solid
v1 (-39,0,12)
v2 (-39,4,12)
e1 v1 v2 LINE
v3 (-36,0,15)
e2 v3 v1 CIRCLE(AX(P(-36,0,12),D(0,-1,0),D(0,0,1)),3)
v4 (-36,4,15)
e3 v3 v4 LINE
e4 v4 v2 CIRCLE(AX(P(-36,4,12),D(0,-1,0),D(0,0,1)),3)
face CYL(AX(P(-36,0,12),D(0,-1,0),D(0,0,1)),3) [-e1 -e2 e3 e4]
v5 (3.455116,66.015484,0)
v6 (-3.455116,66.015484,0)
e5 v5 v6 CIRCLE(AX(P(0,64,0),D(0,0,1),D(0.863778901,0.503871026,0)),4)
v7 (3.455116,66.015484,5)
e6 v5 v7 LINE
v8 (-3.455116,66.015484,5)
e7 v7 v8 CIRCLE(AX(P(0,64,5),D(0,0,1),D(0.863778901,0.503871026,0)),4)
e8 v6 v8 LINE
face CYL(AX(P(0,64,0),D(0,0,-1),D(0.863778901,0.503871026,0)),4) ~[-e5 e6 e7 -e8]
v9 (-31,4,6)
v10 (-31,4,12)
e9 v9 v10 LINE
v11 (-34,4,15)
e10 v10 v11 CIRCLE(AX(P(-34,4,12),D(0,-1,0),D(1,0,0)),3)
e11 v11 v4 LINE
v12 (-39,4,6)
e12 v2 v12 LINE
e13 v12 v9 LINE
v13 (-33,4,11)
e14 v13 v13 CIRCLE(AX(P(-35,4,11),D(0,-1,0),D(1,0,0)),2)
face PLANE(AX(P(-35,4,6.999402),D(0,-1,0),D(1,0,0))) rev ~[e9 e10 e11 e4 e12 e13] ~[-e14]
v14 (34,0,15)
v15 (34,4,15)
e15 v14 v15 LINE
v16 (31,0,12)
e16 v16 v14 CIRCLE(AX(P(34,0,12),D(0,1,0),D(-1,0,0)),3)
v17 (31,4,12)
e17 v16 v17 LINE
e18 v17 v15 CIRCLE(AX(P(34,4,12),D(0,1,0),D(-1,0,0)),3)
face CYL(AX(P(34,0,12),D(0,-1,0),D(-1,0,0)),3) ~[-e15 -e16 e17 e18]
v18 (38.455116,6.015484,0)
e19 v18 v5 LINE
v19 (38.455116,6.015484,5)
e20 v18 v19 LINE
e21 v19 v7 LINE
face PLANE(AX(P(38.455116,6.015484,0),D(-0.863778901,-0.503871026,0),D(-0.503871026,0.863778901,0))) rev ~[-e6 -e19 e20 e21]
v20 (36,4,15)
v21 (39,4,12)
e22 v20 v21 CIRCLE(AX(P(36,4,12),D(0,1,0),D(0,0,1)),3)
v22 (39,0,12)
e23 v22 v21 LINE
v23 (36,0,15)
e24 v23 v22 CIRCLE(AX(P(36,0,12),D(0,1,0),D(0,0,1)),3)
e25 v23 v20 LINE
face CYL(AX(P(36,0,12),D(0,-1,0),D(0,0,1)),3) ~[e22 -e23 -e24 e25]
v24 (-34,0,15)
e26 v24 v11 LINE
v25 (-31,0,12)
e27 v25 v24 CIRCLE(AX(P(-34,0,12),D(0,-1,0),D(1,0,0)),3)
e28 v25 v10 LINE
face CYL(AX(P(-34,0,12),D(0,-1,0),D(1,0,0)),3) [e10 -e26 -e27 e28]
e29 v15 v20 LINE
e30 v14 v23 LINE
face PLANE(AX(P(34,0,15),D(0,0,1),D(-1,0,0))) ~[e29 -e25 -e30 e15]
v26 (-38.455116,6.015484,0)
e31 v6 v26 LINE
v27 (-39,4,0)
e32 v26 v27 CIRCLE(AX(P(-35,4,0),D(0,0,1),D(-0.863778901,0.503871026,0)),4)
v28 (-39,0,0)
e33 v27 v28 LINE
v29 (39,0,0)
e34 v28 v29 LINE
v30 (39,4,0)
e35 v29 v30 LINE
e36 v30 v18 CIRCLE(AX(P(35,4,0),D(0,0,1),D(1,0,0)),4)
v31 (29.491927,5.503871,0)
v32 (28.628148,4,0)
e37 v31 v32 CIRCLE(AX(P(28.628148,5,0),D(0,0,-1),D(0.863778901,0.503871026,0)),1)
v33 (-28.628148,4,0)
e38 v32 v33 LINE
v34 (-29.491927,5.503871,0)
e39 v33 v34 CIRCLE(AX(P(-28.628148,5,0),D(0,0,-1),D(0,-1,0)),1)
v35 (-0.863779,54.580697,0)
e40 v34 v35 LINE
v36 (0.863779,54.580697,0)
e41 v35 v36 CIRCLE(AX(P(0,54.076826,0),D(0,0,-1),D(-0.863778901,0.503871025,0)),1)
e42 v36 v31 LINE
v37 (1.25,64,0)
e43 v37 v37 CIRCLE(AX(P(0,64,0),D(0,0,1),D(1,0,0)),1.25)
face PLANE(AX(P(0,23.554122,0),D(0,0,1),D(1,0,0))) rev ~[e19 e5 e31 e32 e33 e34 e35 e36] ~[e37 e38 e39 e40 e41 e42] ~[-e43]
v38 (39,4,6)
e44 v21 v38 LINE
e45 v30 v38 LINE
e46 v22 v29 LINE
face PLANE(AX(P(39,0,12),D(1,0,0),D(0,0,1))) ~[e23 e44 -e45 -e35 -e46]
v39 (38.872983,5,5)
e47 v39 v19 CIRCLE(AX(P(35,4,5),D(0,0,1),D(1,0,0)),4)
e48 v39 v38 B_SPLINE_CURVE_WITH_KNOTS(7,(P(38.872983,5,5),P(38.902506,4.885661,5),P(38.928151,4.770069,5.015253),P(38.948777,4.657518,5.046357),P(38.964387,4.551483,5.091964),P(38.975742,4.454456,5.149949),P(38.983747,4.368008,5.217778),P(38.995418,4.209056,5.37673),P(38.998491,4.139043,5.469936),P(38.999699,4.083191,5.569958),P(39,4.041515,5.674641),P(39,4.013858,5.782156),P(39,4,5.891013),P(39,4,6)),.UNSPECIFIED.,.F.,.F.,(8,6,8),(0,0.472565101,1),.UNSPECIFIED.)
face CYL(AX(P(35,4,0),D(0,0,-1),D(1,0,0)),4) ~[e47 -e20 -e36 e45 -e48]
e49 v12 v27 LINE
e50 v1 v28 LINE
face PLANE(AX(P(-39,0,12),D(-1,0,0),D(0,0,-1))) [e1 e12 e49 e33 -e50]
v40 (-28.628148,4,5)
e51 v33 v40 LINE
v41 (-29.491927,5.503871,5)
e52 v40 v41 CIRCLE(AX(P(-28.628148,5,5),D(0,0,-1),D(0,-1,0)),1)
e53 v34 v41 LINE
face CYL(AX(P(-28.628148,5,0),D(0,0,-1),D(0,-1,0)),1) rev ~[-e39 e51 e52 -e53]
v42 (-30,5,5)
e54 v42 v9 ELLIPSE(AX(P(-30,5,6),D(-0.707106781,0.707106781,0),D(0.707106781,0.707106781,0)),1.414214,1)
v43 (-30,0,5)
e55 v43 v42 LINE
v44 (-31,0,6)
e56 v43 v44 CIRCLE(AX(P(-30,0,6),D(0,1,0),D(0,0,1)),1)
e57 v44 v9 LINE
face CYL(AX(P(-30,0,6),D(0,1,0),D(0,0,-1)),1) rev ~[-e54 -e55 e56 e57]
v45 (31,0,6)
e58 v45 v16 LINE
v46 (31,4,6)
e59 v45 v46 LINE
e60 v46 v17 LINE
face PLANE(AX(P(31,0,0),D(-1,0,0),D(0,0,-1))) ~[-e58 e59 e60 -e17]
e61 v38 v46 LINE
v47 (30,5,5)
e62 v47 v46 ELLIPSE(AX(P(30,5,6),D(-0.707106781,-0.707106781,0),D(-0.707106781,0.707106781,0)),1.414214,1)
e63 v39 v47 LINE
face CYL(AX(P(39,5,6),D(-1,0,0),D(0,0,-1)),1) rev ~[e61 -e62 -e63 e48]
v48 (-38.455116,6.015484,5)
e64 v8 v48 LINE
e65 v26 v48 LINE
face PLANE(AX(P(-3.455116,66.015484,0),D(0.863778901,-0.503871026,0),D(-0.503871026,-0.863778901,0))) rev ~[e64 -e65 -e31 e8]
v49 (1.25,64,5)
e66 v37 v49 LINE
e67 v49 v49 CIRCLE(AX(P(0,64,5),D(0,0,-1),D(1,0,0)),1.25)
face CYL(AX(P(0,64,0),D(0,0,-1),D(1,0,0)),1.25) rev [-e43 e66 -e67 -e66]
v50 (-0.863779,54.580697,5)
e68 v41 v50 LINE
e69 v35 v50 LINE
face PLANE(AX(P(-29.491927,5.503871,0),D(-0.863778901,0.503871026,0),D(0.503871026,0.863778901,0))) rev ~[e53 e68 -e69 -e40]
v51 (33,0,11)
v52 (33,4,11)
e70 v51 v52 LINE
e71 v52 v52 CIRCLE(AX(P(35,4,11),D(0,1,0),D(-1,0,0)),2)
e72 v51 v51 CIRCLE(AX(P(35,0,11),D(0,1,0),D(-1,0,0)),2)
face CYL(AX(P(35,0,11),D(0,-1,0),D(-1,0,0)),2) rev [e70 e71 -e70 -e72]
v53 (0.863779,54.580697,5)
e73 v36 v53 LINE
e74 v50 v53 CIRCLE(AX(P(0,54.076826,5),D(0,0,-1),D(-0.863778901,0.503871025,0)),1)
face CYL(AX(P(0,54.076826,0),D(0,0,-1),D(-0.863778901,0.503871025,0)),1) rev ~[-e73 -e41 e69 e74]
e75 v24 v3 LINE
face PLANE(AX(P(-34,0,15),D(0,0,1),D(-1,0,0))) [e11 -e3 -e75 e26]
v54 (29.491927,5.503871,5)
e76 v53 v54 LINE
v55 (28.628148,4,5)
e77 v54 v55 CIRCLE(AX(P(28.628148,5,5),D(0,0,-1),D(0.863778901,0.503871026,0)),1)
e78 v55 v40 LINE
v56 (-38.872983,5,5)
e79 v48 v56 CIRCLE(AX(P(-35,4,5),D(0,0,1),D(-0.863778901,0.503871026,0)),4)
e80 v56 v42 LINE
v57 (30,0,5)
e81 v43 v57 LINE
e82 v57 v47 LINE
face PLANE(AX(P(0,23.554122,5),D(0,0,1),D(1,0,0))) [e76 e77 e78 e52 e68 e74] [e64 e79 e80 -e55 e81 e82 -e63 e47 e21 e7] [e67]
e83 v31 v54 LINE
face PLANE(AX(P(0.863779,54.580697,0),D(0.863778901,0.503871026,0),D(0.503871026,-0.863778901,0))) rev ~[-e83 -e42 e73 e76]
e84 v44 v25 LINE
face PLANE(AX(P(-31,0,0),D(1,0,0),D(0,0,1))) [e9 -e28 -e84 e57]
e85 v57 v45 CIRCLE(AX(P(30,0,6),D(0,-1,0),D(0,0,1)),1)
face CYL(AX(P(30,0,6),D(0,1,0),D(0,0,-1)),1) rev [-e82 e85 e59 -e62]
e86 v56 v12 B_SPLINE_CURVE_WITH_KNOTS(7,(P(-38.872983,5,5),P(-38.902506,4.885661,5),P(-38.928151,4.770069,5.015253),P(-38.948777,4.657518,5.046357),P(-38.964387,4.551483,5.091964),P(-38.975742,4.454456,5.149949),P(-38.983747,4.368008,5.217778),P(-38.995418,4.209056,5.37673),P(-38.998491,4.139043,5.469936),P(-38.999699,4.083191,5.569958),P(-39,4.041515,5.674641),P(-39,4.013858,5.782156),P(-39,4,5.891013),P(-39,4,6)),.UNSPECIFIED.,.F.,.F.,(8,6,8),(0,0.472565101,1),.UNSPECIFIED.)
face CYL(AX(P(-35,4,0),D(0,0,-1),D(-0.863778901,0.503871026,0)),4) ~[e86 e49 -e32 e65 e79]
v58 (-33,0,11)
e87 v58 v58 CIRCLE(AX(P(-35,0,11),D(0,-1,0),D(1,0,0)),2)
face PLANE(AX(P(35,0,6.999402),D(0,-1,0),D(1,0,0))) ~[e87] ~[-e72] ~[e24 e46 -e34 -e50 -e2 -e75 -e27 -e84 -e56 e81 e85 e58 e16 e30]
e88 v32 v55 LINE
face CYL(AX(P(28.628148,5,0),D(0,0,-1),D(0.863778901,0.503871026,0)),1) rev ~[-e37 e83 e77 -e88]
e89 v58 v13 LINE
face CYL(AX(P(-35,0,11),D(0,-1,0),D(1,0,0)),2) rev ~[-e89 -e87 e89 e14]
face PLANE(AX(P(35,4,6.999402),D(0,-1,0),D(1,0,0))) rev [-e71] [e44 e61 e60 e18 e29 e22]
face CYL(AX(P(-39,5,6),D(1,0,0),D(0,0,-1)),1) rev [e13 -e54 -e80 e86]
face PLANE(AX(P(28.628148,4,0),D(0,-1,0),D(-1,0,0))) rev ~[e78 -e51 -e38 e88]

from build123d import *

# Parameters (mm, degrees)
F0_R     = 1.25
F1_DEPTH = 5
F2_R     = 2
F3_DEPTH = 4
F5_R     = 1


with BuildPart() as f1:
    # F0 (on Top) → F1 (new body)
    with BuildSketch(Plane.XY):
        with BuildLine():
            ThreePointArc((3.4551156036, 66.0154841021), (0, 68), (-3.4551156036, 66.0154841021))
            Line((-3.4551156036, 66.0154841021), (-38.4551156036, 6.0154841021))
            ThreePointArc((-38.4551156036, 6.0154841021), (-38.8613768538, 5.0439199169), (-39, 4))
            Line((-39, 4), (-39, 0))
            Line((-39, 0), (39, 0))
            Line((39, 0), (39, 4))
            ThreePointArc((39, 4), (38.8613768538, 5.0439199169), (38.4551156036, 6.0154841021))
            Line((38.4551156036, 6.0154841021), (3.4551156036, 66.0154841021))
        make_face()
        with BuildLine():
            Line((-29.4919272386, 5.5038710255), (-0.8637789009, 54.5806967473))
            ThreePointArc((-0.8637789009, 54.5806967473), (0, 55.0768257218), (0.8637789009, 54.5806967473))
            Line((0.8637789009, 54.5806967473), (29.4919272386, 5.5038710255))
            ThreePointArc((29.4919272386, 5.5038710255), (29.4952904903, 4.5019392735), (28.6281483377, 4))
            Line((28.6281483377, 4), (-28.6281483377, 4))
            ThreePointArc((-28.6281483377, 4), (-29.4952904903, 4.5019392735), (-29.4919272386, 5.5038710255))
        make_face(mode=Mode.SUBTRACT)
        with Locations((0, 64)):
            Circle(F0_R, mode=Mode.SUBTRACT)
    extrude(amount=F1_DEPTH)

    # F2 (on Front) → F3 (join)
    with BuildSketch(Plane.XZ):
        with BuildLine():
            Line((-39, 12), (-39, 0))
            Line((-39, 0), (-31, 0))
            Line((-31, 0), (-31, 12))
            ThreePointArc((-31, 12), (-31.8786796564, 14.1213203436), (-34, 15))
            Line((-34, 15), (-36, 15))
            ThreePointArc((-36, 15), (-38.1213203436, 14.1213203436), (-39, 12))
        make_face()
        with Locations((-35, 11)):
            Circle(F2_R, mode=Mode.SUBTRACT)
    extrude(amount=-F3_DEPTH)

    # F4: F1 across plane


with BuildPart() as f1_1:
    add(f1.part)
    add(f1.part.mirror(Plane.YZ))

    # F5
    f5_edges = [f1_1.edges().sort_by_distance(p)[0] for p in [
        (-35, 4, 5),
        (-31, 2, 5),
        (31, 2, 5),
        (35, 4, 5),
    ]]
    fillet(f5_edges, radius=F5_R)


solid = f1_1.part
